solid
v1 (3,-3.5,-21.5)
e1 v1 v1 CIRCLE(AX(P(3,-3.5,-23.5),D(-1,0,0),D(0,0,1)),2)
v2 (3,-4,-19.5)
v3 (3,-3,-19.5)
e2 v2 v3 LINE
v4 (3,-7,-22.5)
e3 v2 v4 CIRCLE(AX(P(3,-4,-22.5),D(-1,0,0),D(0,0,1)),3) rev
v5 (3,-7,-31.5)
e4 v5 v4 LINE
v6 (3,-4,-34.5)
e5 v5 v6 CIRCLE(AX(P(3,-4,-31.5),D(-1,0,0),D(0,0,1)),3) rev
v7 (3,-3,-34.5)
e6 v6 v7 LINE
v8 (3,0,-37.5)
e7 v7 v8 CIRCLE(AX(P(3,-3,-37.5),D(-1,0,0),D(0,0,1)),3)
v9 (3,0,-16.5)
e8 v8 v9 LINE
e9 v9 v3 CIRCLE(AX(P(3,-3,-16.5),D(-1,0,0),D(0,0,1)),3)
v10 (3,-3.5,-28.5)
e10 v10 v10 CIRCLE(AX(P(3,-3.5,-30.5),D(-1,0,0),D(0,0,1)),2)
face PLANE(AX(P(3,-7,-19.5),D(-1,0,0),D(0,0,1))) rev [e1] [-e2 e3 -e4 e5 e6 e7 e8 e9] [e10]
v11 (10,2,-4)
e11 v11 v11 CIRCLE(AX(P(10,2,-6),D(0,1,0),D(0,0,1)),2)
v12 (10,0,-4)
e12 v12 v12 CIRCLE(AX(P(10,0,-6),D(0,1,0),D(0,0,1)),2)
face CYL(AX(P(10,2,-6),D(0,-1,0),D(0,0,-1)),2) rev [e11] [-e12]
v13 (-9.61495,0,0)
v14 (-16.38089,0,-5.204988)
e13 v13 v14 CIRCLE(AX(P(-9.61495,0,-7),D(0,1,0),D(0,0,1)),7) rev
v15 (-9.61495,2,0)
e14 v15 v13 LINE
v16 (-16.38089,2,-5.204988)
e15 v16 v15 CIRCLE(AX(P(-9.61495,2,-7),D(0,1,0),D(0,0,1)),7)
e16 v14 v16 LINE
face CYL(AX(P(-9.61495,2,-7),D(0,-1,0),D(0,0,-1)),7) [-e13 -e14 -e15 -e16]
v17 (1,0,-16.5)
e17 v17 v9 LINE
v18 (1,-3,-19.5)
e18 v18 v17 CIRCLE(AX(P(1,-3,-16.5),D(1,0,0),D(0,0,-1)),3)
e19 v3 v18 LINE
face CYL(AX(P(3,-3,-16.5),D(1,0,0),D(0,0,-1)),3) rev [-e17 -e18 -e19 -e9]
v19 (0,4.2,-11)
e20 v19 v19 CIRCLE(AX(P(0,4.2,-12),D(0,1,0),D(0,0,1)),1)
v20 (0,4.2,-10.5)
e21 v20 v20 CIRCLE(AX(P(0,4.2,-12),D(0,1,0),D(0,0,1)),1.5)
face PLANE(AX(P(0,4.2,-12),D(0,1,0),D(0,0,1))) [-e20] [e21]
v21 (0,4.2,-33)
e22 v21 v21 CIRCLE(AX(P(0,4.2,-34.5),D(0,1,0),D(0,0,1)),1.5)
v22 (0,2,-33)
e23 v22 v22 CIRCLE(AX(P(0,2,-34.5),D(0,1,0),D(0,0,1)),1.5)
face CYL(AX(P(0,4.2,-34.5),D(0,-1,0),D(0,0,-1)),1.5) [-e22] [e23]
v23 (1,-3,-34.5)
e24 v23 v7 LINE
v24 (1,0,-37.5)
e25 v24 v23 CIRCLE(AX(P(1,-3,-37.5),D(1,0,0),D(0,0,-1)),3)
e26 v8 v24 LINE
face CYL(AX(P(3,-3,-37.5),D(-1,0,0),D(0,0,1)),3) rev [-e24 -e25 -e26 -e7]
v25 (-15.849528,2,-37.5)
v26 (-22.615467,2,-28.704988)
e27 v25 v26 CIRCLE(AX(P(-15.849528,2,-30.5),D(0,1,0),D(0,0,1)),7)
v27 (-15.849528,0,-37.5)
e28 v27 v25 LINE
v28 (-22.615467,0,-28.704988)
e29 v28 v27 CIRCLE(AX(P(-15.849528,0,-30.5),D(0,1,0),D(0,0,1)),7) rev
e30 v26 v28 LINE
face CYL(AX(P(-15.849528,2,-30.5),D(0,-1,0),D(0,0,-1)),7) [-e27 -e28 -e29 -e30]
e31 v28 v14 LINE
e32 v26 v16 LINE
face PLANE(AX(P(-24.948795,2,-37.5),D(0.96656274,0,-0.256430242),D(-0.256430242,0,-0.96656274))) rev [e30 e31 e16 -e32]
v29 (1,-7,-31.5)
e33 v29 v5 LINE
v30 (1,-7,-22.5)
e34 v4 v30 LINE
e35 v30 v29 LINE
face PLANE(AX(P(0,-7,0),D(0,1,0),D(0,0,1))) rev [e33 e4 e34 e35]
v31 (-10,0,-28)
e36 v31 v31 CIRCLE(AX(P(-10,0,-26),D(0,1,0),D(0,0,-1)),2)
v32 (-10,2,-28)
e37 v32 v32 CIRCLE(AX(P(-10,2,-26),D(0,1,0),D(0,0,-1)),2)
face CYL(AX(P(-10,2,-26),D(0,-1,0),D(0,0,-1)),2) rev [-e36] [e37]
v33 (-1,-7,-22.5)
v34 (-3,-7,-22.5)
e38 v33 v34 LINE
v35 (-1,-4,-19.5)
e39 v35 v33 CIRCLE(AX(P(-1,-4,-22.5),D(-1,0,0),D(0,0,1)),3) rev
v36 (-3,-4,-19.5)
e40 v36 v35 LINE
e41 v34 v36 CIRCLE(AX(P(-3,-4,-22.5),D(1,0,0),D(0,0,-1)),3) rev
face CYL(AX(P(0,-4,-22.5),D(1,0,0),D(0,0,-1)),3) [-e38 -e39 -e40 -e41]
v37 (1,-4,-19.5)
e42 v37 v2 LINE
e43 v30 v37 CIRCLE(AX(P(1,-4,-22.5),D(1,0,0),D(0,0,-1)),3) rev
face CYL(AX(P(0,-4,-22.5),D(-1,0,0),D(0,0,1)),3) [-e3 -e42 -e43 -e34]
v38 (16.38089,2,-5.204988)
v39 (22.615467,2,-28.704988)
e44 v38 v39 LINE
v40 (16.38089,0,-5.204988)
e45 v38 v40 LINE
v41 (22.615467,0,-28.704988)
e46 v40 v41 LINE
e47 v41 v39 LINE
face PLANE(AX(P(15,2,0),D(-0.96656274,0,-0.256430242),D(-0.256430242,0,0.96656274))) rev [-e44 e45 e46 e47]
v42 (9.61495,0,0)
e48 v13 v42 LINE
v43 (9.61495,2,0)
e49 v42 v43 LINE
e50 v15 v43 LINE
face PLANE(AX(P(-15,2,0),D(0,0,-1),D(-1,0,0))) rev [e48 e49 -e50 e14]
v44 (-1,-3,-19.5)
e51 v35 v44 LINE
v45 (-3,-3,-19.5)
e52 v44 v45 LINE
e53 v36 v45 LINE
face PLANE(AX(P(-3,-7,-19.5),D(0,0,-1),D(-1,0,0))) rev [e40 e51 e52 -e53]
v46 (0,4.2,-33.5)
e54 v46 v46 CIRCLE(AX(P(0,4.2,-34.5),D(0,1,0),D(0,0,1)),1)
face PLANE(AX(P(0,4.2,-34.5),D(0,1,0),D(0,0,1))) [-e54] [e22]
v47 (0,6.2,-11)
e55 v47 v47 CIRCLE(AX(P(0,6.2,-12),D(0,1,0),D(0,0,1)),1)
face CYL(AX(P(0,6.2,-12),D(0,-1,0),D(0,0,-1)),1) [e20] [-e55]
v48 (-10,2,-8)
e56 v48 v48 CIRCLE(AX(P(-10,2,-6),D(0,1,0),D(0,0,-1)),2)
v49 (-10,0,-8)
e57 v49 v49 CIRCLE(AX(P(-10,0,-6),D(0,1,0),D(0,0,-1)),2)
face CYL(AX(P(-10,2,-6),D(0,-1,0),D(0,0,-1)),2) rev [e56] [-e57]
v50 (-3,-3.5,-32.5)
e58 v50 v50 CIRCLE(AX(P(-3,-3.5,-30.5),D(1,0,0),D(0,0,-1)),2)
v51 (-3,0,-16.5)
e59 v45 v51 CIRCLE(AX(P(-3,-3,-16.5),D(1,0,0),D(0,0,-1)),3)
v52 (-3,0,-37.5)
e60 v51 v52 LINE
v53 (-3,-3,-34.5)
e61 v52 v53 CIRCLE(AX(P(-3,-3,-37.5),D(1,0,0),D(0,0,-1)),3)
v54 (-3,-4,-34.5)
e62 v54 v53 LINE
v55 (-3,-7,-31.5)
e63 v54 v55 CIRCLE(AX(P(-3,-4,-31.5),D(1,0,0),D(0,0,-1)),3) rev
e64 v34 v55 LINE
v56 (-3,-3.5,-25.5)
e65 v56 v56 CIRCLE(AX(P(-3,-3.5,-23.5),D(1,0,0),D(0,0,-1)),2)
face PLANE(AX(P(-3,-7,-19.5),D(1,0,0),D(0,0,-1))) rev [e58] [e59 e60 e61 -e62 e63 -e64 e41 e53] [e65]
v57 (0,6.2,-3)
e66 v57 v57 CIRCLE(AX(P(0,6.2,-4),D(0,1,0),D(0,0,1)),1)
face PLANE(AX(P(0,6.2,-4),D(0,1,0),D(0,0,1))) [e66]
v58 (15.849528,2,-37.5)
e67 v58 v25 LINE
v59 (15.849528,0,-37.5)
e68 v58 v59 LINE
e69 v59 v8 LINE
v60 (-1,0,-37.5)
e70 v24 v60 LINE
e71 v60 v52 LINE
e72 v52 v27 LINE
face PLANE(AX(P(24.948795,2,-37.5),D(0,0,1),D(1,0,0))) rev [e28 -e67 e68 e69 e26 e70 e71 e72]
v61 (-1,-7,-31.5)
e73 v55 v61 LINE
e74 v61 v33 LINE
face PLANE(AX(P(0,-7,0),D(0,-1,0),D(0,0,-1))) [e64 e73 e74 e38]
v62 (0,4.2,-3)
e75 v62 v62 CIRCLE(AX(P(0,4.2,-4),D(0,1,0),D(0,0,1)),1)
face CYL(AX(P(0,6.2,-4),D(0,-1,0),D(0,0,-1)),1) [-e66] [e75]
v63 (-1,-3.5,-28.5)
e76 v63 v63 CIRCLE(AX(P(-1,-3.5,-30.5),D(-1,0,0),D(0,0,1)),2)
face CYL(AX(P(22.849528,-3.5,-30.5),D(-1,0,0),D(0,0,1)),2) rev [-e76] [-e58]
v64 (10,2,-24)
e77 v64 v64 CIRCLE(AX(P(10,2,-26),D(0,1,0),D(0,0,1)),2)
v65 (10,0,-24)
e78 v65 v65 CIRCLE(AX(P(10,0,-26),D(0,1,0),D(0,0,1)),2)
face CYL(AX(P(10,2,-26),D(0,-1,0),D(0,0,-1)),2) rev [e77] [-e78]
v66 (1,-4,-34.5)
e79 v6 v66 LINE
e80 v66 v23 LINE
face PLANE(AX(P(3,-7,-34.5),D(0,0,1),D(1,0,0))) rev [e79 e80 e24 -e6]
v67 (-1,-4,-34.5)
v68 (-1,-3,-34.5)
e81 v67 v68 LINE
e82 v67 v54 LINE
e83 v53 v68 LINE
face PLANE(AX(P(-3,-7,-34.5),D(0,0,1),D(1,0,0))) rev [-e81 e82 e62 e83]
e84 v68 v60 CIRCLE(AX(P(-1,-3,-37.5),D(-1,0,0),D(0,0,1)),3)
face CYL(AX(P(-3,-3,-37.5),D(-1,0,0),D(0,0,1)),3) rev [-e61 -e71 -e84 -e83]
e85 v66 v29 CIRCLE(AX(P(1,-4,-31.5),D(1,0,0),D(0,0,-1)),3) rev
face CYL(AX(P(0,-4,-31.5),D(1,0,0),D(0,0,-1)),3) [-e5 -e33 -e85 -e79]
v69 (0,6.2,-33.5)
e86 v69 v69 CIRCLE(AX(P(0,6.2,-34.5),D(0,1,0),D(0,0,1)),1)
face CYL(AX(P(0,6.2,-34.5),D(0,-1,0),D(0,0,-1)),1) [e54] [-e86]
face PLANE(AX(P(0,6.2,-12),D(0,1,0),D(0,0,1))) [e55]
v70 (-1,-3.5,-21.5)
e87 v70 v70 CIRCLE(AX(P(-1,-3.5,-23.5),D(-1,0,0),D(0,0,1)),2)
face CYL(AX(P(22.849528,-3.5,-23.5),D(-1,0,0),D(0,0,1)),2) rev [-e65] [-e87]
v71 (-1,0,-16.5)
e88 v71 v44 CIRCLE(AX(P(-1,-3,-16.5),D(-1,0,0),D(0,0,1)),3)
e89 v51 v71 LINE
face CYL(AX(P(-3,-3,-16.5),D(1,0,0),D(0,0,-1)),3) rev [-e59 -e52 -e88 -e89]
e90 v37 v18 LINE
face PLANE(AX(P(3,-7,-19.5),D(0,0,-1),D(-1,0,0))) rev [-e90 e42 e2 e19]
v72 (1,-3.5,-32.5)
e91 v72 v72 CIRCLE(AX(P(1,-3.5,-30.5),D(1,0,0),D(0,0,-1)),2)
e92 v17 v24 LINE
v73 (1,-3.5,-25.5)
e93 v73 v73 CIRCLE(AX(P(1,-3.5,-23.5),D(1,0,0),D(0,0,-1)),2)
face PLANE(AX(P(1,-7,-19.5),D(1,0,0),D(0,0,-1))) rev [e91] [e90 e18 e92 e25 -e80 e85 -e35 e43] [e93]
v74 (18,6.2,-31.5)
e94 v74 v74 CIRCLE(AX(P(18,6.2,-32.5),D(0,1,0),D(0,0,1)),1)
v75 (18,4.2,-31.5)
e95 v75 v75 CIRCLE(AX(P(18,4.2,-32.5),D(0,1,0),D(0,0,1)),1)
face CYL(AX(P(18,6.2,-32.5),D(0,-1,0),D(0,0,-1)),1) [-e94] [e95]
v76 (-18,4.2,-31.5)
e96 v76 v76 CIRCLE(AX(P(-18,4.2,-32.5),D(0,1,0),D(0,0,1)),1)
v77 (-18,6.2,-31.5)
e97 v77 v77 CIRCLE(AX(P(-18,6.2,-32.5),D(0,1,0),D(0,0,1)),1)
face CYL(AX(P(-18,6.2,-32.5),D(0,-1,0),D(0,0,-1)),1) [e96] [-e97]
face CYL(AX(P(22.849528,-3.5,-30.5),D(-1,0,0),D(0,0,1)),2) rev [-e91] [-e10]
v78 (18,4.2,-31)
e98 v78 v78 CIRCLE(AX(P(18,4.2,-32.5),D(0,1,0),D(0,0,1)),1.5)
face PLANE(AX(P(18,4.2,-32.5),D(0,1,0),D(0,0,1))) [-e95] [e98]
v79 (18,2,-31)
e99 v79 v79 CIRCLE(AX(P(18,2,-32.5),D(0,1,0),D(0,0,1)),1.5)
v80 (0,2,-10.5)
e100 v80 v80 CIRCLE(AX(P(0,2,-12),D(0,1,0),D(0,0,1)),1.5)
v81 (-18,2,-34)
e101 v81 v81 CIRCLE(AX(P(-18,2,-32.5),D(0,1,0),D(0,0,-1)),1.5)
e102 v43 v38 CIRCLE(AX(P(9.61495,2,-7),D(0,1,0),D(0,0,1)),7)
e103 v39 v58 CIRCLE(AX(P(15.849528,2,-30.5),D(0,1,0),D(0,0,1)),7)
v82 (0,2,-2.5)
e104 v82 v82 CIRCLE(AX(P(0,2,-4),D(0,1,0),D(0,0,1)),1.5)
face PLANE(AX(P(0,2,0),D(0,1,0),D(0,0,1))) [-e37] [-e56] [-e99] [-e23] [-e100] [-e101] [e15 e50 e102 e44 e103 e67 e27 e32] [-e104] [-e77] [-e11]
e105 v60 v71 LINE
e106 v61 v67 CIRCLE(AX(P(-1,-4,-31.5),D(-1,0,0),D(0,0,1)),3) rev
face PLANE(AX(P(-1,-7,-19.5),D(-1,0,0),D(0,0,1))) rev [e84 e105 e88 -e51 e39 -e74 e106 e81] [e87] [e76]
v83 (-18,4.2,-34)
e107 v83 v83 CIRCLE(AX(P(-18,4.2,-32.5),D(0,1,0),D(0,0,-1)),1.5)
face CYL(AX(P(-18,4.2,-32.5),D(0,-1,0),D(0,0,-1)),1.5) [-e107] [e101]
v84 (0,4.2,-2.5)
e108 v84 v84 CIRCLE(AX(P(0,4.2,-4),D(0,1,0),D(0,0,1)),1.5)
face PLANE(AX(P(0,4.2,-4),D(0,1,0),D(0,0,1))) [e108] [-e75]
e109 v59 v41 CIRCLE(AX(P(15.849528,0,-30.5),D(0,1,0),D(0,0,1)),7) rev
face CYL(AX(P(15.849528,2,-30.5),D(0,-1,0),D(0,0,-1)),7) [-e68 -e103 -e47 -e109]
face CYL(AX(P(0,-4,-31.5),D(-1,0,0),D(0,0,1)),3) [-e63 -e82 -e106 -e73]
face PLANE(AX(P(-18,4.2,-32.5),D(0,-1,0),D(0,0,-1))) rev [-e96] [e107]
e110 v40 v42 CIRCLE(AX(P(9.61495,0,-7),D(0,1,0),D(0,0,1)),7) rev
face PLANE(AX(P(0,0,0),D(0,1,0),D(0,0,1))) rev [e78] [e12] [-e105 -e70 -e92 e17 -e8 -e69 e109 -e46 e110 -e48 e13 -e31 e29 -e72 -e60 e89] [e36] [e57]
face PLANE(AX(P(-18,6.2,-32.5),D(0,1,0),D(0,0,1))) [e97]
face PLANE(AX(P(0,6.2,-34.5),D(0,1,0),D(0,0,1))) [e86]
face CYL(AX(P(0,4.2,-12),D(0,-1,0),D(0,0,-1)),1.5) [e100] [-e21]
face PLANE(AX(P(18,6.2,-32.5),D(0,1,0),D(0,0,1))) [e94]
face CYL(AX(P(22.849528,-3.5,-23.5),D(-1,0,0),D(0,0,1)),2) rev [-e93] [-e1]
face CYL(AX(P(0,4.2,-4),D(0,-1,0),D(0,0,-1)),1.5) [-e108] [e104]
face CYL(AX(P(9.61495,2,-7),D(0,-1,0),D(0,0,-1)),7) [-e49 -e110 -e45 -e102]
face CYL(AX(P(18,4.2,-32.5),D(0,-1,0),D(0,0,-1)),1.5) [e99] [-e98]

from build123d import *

# Parameters (mm, degrees)
SKETCH1_R               = 2
BOSS_EXTRUDE1_DEPTH     = 2
FILLET1_R               = 7
SKETCH2_R               = 1.5
BOSS_EXTRUDE2_DEPTH     = 2.2
SKETCH3_R               = 1
BOSS_EXTRUDE3_DEPTH     = 2
SKETCH4_W               = 2
SKETCH4_H               = 15
BOSS_EXTRUDE4_DEPTH     = 7
FILLET3_START           = -3
FILLET3_DEPTH           = 6
FILLET3_2_DEPTH         = 2
FILLET3_START_2         = 1
FILLET3_3_DEPTH         = 2
CUT_EXTRUDE1_DEPTH      = 47.08088663
CUT_EXTRUDE1_DEPTH_BACK = 47.08088663
SKETCH5_R               = 2


with BuildPart() as part:
    # Sketch1 → Boss-Extrude1 (new body)
    with BuildSketch(Plane(origin=(0, 0, 0), x_dir=(1, 0, 0), z_dir=(0, 1, 0))):
        Polygon((-15, 0), (15, 0), (24.948794511, 37.5), (-24.948794511, 37.5), align=None)
        with Locations(Location((10, 26, 0), (0, 0, 270))):
            Circle(SKETCH1_R, mode=Mode.SUBTRACT)
        with Locations(Location((10, 6, 0), (0, 0, 270))):
            Circle(SKETCH1_R, mode=Mode.SUBTRACT)
        with Locations(Location((-10, 6, 0), (0, 0, 90))):
            Circle(SKETCH1_R, mode=Mode.SUBTRACT)
        with Locations(Location((-10, 26, 0), (0, 0, 90))):
            Circle(SKETCH1_R, mode=Mode.SUBTRACT)
    extrude(amount=BOSS_EXTRUDE1_DEPTH)

    # Fillet1
    fillet1_edges = [part.edges().sort_by_distance(p)[0] for p in [
        (-24.948794511, 1, -37.5),
        (24.948794511, 1, -37.5),
        (15, 1, 0),
        (-15, 1, 0),
    ]]
    fillet(fillet1_edges, radius=FILLET1_R)

    # Sketch2 → Boss-Extrude2 (add)
    with BuildSketch(Plane(origin=(0, 2, 0), x_dir=(1, 0, 0), z_dir=(0, 1, 0))):
        with Locations(Location((0, 34.5, 0), (0, 0, 270))):
            Circle(SKETCH2_R)
        with Locations(Location((18, 32.5, 0), (0, 0, 270))):
            Circle(SKETCH2_R)
        with Locations(Location((0, 4, 0), (0, 0, 270))):
            Circle(SKETCH2_R)
        with Locations(Location((0, 12, 0), (0, 0, 270))):
            Circle(SKETCH2_R)
        with Locations(Location((-18, 32.5, 0), (0, 0, 90))):
            Circle(SKETCH2_R)
    extrude(amount=BOSS_EXTRUDE2_DEPTH)

    # Sketch3 → Boss-Extrude3 (add)
    with BuildSketch(Plane(origin=(0, 4.2, 0), x_dir=(1, 0, 0), z_dir=(0, 1, 0))):
        with Locations(Location((-18, 32.5, 0), (0, 0, 270))):
            Circle(SKETCH3_R)
        with Locations(Location((0, 34.5, 0), (0, 0, 270))):
            Circle(SKETCH3_R)
        with Locations(Location((18, 32.5, 0), (0, 0, 270))):
            Circle(SKETCH3_R)
        with Locations(Location((0, 12, 0), (0, 0, 270))):
            Circle(SKETCH3_R)
        with Locations(Location((0, 4, 0), (0, 0, 270))):
            Circle(SKETCH3_R)
    extrude(amount=BOSS_EXTRUDE3_DEPTH)

    # Sketch4 → Boss-Extrude4 (add)
    with BuildSketch(Plane.XZ):
        with Locations((-2, -27)):
            Rectangle(SKETCH4_W, SKETCH4_H)
        with Locations((2, -27)):
            Rectangle(SKETCH4_W, SKETCH4_H)
    extrude(amount=BOSS_EXTRUDE4_DEPTH)

    # Fillet3: read off the stored shape, not the designer's step
    # Fillet3 outline → Fillet3 (cut)
    with BuildSketch(Plane.YZ.offset(FILLET3_START)):
        with BuildLine():
            Line((-7, -34.5), (-4, -34.5))
            ThreePointArc((-4, -34.5), (-6.121320344, -33.621320344), (-7, -31.5))
            Line((-7, -31.5), (-7, -34.5))
        make_face()
        with BuildLine():
            Line((-7, -19.5), (-7, -22.5))
            ThreePointArc((-7, -22.5), (-6.121320344, -20.378679656), (-4, -19.5))
            Line((-4, -19.5), (-7, -19.5))
        make_face()
    extrude(amount=FILLET3_DEPTH, mode=Mode.SUBTRACT)

    # Fillet3 2 outline → Fillet3 2 (add)
    with BuildSketch(Plane.YZ.offset(FILLET3_START)):
        with BuildLine():
            Line((0, -34.5), (-3, -34.5))
            ThreePointArc((-3, -34.5), (-0.878679656, -35.378679656), (0, -37.5))
            Line((0, -37.5), (0, -34.5))
        make_face()
        with BuildLine():
            Line((-3, -19.5), (0, -19.5))
            Line((0, -19.5), (0, -16.5))
            ThreePointArc((0, -16.5), (-0.878679656, -18.621320344), (-3, -19.5))
        make_face()
    extrude(amount=FILLET3_2_DEPTH)

    # Fillet3 3 outline → Fillet3 3 (add)
    with BuildSketch(Plane.YZ.offset(FILLET3_START_2)):
        with BuildLine():
            Line((0, -34.5), (-3, -34.5))
            ThreePointArc((-3, -34.5), (-0.878679656, -35.378679656), (0, -37.5))
            Line((0, -37.5), (0, -34.5))
        make_face()
        with BuildLine():
            Line((-3, -19.5), (0, -19.5))
            Line((0, -19.5), (0, -16.5))
            ThreePointArc((0, -16.5), (-0.878679656, -18.621320344), (-3, -19.5))
        make_face()
    extrude(amount=FILLET3_3_DEPTH)

    # Sketch5 → Cut-Extrude1 (cut, two sides: drawn at the far end of the back side and taken through both)
    with BuildSketch(Plane.ZY.offset(3).offset(-CUT_EXTRUDE1_DEPTH_BACK)):
        with Locations((-30.5, -3.5)):
            Circle(SKETCH5_R)
        with Locations((-23.5, -3.5)):
            Circle(SKETCH5_R)
    extrude(amount=CUT_EXTRUDE1_DEPTH + CUT_EXTRUDE1_DEPTH_BACK, mode=Mode.SUBTRACT)


solid = part.part
